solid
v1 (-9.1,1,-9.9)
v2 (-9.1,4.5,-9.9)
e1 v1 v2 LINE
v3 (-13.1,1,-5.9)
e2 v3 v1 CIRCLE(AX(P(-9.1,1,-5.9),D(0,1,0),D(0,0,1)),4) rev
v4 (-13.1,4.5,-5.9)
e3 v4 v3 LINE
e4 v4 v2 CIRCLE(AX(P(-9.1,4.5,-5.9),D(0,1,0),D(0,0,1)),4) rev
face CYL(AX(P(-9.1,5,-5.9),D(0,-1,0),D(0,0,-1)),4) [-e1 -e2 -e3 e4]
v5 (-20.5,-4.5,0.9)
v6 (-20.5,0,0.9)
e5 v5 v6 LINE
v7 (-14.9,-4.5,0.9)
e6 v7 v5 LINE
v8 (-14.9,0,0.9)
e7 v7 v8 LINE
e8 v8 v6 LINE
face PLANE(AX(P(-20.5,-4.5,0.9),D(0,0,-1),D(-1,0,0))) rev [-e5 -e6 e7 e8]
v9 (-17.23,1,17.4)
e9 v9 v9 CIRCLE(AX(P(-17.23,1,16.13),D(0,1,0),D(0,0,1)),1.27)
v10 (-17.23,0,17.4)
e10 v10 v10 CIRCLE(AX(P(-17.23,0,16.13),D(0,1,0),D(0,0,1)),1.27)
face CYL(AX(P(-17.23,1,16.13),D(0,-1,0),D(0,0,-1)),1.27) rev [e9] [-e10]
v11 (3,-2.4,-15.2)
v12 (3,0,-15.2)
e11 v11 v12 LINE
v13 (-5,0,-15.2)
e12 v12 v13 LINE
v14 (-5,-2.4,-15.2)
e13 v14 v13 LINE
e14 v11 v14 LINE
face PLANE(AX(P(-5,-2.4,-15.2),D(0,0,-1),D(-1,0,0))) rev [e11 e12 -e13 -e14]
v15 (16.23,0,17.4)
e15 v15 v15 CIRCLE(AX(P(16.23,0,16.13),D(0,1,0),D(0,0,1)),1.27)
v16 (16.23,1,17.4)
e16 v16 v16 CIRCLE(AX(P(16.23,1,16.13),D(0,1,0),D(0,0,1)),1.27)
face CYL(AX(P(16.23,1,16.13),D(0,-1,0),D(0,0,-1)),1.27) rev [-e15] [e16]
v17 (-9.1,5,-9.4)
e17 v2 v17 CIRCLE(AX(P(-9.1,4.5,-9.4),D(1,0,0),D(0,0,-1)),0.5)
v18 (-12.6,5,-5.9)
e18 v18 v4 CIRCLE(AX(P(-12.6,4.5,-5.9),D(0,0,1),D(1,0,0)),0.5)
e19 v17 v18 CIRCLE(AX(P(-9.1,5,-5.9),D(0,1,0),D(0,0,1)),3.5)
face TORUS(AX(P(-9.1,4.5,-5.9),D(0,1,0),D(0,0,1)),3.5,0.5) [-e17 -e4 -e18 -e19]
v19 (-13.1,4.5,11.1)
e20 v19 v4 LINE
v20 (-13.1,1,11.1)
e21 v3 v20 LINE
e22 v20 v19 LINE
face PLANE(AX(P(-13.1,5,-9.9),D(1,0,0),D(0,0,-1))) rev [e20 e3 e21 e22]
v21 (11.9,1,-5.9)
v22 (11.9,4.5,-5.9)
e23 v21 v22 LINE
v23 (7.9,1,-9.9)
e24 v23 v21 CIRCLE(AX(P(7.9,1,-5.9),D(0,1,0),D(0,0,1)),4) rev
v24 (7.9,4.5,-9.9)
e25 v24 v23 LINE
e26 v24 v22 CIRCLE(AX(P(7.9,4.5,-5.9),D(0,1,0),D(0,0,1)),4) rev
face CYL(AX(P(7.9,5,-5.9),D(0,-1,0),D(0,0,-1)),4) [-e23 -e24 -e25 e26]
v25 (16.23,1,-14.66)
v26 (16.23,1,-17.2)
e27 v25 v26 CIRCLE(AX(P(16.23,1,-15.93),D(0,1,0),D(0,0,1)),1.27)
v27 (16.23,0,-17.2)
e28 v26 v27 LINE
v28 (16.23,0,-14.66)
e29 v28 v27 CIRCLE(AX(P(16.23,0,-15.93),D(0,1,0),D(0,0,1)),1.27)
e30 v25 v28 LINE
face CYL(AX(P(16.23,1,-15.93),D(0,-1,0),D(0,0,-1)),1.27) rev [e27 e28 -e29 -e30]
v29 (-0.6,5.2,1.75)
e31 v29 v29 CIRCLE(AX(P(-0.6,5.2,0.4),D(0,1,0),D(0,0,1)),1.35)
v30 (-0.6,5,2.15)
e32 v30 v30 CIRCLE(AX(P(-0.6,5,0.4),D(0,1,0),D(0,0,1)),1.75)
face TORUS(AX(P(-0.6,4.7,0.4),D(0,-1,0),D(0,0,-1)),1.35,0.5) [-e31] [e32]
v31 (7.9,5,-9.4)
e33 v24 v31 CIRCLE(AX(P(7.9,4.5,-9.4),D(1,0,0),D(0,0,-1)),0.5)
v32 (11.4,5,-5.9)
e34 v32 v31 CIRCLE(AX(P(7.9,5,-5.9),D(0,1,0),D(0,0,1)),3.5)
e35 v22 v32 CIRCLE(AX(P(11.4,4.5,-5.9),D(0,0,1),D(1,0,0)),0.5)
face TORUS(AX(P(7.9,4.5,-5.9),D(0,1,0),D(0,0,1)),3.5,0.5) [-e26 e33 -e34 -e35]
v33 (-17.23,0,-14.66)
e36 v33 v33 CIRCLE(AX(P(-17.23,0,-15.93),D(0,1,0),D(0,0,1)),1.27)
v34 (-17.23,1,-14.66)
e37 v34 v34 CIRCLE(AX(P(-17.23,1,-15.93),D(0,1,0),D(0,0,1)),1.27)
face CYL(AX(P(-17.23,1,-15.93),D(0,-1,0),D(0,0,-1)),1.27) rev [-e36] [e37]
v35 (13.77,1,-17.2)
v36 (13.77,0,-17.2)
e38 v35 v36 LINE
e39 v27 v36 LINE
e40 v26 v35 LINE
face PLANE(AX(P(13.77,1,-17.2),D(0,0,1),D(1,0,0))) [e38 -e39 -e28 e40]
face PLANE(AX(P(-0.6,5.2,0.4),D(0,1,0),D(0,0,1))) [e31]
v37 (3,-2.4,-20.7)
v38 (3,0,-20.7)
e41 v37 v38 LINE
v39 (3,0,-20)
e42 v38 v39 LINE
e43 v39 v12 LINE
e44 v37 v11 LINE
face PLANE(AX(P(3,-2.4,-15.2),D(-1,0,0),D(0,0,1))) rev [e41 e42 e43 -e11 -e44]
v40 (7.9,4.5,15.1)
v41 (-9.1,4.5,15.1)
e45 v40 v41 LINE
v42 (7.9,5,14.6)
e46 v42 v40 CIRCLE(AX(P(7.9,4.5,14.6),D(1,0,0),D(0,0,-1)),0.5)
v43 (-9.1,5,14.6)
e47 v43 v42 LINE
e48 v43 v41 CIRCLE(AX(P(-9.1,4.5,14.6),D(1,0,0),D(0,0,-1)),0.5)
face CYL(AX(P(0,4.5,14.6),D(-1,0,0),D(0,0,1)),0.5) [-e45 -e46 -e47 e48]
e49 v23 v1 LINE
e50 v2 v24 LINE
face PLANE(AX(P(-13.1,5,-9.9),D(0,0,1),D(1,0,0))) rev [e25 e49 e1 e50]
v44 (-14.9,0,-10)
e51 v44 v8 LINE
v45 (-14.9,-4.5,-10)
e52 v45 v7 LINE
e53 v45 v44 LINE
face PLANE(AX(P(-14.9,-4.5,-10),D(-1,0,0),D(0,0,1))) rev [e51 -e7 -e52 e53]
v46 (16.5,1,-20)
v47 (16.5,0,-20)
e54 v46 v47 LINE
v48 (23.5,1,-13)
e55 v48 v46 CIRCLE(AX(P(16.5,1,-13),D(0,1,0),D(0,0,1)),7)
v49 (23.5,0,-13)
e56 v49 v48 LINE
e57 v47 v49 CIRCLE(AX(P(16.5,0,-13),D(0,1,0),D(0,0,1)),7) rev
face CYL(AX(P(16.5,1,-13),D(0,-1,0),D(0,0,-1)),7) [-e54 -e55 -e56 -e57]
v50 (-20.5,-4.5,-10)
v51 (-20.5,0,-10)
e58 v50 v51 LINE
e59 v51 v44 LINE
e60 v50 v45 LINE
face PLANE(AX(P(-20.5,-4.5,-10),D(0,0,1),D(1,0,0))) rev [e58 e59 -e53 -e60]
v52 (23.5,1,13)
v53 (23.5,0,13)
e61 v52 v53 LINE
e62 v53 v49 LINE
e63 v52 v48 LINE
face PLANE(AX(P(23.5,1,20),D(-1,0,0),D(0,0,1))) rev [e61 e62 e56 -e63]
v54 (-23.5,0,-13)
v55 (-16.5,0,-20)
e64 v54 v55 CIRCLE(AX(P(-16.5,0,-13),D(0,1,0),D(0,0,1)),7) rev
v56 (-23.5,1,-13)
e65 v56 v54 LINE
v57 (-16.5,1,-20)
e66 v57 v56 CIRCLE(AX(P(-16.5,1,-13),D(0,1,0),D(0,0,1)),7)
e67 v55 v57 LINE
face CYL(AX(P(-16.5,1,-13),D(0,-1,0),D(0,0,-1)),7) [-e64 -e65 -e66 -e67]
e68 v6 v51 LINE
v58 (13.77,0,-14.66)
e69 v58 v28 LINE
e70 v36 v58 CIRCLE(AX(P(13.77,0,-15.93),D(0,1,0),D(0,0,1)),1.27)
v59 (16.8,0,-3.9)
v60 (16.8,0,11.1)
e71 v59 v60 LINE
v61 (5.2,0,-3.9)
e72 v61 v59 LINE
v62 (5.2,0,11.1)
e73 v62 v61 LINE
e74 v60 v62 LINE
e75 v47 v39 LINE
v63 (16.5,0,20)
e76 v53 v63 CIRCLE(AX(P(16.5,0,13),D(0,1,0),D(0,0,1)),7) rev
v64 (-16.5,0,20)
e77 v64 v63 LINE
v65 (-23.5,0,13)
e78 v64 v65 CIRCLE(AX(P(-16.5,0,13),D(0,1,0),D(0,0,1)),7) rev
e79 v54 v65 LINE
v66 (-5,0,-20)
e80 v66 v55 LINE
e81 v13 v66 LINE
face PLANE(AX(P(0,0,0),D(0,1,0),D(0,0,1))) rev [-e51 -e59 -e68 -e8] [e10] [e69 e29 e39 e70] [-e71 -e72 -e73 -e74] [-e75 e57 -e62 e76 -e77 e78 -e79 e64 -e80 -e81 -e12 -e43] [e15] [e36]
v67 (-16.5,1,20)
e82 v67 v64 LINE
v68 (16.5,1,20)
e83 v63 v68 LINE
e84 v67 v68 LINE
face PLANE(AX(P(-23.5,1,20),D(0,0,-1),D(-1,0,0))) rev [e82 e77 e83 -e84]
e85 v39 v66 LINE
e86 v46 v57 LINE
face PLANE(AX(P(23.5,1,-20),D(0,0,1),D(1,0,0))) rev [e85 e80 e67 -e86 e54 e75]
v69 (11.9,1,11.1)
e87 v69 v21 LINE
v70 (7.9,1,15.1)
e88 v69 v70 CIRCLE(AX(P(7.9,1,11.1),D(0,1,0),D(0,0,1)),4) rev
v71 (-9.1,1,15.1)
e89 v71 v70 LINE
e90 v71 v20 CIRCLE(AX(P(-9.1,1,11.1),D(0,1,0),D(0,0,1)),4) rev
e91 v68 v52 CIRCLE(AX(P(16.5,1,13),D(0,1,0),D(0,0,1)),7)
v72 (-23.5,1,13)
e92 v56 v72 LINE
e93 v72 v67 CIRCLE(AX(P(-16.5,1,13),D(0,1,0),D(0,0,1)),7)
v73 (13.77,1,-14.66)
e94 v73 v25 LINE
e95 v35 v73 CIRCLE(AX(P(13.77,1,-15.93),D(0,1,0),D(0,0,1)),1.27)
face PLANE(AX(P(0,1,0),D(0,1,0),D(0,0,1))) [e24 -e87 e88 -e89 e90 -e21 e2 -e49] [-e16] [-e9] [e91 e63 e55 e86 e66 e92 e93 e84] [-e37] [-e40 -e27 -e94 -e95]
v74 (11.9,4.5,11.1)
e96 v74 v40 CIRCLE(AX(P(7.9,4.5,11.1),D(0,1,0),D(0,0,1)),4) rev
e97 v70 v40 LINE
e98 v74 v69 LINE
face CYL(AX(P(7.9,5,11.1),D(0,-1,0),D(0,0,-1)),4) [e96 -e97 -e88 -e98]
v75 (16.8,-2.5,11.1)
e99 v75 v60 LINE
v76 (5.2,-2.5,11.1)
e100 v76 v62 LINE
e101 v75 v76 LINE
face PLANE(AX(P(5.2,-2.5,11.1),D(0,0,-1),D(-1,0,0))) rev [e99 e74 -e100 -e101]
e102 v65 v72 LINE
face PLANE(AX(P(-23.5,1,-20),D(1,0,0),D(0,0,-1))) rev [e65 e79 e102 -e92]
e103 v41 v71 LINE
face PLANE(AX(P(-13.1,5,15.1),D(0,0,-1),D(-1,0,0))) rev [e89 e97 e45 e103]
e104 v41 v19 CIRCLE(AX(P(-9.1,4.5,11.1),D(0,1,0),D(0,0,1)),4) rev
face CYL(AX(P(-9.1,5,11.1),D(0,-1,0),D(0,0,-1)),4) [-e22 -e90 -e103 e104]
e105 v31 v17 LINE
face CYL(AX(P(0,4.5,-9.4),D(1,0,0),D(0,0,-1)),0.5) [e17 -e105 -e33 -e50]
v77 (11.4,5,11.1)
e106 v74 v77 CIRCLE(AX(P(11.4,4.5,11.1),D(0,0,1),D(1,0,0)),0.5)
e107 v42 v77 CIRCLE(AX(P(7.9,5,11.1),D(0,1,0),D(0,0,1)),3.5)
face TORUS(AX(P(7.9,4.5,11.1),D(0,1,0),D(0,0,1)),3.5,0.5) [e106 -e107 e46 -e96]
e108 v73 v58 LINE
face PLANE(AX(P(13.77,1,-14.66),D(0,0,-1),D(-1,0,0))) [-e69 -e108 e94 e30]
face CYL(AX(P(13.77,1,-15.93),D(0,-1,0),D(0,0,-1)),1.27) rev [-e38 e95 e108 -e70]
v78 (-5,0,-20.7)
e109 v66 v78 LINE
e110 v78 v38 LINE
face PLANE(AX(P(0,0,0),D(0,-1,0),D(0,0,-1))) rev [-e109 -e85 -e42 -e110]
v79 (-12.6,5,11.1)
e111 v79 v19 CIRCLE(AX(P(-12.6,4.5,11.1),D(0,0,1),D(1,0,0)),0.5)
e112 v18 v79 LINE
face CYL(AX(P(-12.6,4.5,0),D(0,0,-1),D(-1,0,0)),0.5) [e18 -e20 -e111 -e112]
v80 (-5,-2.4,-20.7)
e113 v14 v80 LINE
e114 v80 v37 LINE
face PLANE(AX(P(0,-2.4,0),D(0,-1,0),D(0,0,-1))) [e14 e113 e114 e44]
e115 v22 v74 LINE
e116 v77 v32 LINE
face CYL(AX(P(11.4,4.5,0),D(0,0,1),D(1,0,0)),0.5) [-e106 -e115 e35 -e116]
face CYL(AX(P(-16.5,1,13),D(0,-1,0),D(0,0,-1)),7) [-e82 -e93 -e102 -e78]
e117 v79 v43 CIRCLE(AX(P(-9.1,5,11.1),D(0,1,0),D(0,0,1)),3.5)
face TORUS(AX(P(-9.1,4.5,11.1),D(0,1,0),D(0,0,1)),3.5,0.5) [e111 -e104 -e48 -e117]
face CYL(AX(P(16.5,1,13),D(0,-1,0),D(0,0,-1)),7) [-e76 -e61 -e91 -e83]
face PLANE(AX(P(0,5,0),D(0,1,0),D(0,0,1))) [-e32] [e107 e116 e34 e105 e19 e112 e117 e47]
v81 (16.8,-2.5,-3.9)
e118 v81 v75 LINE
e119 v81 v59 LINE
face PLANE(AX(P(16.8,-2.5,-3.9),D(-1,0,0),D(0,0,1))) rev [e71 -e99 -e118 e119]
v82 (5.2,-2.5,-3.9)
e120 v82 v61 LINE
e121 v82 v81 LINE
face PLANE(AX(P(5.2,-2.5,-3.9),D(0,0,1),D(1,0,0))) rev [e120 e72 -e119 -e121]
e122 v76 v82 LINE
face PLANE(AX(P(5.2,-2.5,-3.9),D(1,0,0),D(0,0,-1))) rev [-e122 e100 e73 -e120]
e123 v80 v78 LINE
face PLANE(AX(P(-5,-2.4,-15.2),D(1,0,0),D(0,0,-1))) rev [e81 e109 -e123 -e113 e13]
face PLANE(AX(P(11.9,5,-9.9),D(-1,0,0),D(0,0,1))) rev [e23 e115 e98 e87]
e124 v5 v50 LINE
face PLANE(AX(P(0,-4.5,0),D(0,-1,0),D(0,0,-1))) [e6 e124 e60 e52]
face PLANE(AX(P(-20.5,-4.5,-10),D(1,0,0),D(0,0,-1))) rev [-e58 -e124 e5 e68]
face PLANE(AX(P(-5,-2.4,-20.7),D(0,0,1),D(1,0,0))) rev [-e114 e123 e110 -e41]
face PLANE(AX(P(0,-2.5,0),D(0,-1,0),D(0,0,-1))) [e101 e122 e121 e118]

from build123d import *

# Parameters (mm, degrees)
SKETCH4_W           = 47
SKETCH4_H           = 40
SKETCH4_R           = 1.27
BOSS_EXTRUDE1_DEPTH = 1
FILLET1_R           = 7
SKETCH5_W           = 11.6
SKETCH5_H           = 15
BOSS_EXTRUDE2_DEPTH = 2.5
SKETCH6_W           = 5.6
SKETCH6_H           = 10.9
BOSS_EXTRUDE3_DEPTH = 4.5
SKETCH7_W           = 25
SKETCH7_H           = 25
BOSS_EXTRUDE4_DEPTH = 4
FILLET2_R           = 4
SKETCH8_R           = 1.75
BOSS_EXTRUDE5_DEPTH = 0.2
FILLET3_R           = 0.5
SKETCH9_W           = 8
SKETCH9_H           = 5.5
BOSS_EXTRUDE6_DEPTH = 2.4
FILLET4_R           = 0.5


with BuildPart() as part:
    # Sketch4 → Boss-Extrude1 (new body)
    with BuildSketch(Plane(origin=(0, 0, 0), x_dir=(1, 0, 0), z_dir=(0, 1, 0))):
        Rectangle(SKETCH4_W, SKETCH4_H)
        with Locations(Location((16.23, -16.13, 0), (0, 0, 270))):
            Circle(SKETCH4_R, mode=Mode.SUBTRACT)
        with Locations(Location((-17.23, -16.13, 0), (0, 0, 270))):
            Circle(SKETCH4_R, mode=Mode.SUBTRACT)
        with Locations(Location((-17.23, 15.93, 0), (0, 0, 270))):
            Circle(SKETCH4_R, mode=Mode.SUBTRACT)
        with BuildLine():
            Line((13.77, 14.66), (16.23, 14.66))
            ThreePointArc((16.23, 14.66), (17.5, 15.93), (16.23, 17.2))
            Line((16.23, 17.2), (13.77, 17.2))
            ThreePointArc((13.77, 17.2), (12.5, 15.93), (13.77, 14.66))
        make_face(mode=Mode.SUBTRACT)
    extrude(amount=BOSS_EXTRUDE1_DEPTH)

    # Fillet1
    fillet1_edges = [part.edges().sort_by_distance(p)[0] for p in [
        (23.5, 0.5, -20),
        (23.5, 0.5, 20),
        (-23.5, 0.5, 20),
        (-23.5, 0.5, -20),
    ]]
    fillet(fillet1_edges, radius=FILLET1_R)

    # Sketch5 → Boss-Extrude2 (add)
    with BuildSketch(Plane.XZ):
        with Locations((11, 3.6)):
            Rectangle(SKETCH5_W, SKETCH5_H)
    extrude(amount=BOSS_EXTRUDE2_DEPTH)

    # Sketch6 → Boss-Extrude3 (add)
    with BuildSketch(Plane.XZ):
        with Locations((-17.7, -4.55)):
            Rectangle(SKETCH6_W, SKETCH6_H)
    extrude(amount=BOSS_EXTRUDE3_DEPTH)

    # Sketch7 → Boss-Extrude4 (add)
    with BuildSketch(Plane(origin=(0, 1, 0), x_dir=(1, 0, 0), z_dir=(0, 1, 0))):
        with Locations((-0.6, -2.6)):
            Rectangle(SKETCH7_W, SKETCH7_H)
    extrude(amount=BOSS_EXTRUDE4_DEPTH)

    # Fillet2
    fillet2_edges = [part.edges().sort_by_distance(p)[0] for p in [
        (-13.1, 3, -9.9),
        (-13.1, 3, 15.1),
        (11.9, 3, 15.1),
        (11.9, 3, -9.9),
    ]]
    fillet(fillet2_edges, radius=FILLET2_R)

    # Sketch8 → Boss-Extrude5 (add)
    with BuildSketch(Plane(origin=(0, 5, 0), x_dir=(1, 0, 0), z_dir=(0, 1, 0))):
        with Locations(Location((-0.6, -0.4, 0), (0, 0, 270))):
            Circle(SKETCH8_R)
    extrude(amount=BOSS_EXTRUDE5_DEPTH)

    # Fillet3
    # the kernel refuses this fillet: 0.5 mm, written as the material it takes off along each edge
    with BuildSketch(Plane(origin=(-0.6, 5.2, 0.4), x_dir=(0, 0, 1), z_dir=(-1, 0, 0))) as fillet3_piece_1:
        with BuildLine():
            CenterArc((1.35, -0.5), FILLET3_R, 36.869897645, 53.130102355)
            Line((1.35, 0), (1.35, 0.01))
            Line((1.35, 0.01), (1.75, 0.01))
            Line((1.75, 0.01), (1.76, 0))
            ThreePointArc((1.76, 0), (1.76, -0.1), (1.758, -0.194))
            Line((1.758, -0.194), (1.75, -0.2))
        make_face()
    revolve(axis=Axis((-0.6, 5.2, 0.4), (0, 1, 0)), mode=Mode.SUBTRACT)

    # Sketch9 → Boss-Extrude6 (add)
    with BuildSketch(Plane.XZ):
        with Locations((-1, -17.95)):
            Rectangle(SKETCH9_W, SKETCH9_H)
    extrude(amount=BOSS_EXTRUDE6_DEPTH)

    # Fillet4
    fillet4_edges = [part.edges().sort_by_distance(p)[0] for p in [
        (-13.1, 5, 2.6),
        (-0.6, 5, -9.9),
        (-0.6, 5, 15.1),
        (11.9, 5, 2.6),
        (10.728427125, 5, -8.728427125),
        (10.728427125, 5, 13.928427125),
        (-11.928427125, 5, 13.928427125),
        (-11.928427125, 5, -8.728427125),
    ]]
    fillet(fillet4_edges, radius=FILLET4_R)


solid = part.part
